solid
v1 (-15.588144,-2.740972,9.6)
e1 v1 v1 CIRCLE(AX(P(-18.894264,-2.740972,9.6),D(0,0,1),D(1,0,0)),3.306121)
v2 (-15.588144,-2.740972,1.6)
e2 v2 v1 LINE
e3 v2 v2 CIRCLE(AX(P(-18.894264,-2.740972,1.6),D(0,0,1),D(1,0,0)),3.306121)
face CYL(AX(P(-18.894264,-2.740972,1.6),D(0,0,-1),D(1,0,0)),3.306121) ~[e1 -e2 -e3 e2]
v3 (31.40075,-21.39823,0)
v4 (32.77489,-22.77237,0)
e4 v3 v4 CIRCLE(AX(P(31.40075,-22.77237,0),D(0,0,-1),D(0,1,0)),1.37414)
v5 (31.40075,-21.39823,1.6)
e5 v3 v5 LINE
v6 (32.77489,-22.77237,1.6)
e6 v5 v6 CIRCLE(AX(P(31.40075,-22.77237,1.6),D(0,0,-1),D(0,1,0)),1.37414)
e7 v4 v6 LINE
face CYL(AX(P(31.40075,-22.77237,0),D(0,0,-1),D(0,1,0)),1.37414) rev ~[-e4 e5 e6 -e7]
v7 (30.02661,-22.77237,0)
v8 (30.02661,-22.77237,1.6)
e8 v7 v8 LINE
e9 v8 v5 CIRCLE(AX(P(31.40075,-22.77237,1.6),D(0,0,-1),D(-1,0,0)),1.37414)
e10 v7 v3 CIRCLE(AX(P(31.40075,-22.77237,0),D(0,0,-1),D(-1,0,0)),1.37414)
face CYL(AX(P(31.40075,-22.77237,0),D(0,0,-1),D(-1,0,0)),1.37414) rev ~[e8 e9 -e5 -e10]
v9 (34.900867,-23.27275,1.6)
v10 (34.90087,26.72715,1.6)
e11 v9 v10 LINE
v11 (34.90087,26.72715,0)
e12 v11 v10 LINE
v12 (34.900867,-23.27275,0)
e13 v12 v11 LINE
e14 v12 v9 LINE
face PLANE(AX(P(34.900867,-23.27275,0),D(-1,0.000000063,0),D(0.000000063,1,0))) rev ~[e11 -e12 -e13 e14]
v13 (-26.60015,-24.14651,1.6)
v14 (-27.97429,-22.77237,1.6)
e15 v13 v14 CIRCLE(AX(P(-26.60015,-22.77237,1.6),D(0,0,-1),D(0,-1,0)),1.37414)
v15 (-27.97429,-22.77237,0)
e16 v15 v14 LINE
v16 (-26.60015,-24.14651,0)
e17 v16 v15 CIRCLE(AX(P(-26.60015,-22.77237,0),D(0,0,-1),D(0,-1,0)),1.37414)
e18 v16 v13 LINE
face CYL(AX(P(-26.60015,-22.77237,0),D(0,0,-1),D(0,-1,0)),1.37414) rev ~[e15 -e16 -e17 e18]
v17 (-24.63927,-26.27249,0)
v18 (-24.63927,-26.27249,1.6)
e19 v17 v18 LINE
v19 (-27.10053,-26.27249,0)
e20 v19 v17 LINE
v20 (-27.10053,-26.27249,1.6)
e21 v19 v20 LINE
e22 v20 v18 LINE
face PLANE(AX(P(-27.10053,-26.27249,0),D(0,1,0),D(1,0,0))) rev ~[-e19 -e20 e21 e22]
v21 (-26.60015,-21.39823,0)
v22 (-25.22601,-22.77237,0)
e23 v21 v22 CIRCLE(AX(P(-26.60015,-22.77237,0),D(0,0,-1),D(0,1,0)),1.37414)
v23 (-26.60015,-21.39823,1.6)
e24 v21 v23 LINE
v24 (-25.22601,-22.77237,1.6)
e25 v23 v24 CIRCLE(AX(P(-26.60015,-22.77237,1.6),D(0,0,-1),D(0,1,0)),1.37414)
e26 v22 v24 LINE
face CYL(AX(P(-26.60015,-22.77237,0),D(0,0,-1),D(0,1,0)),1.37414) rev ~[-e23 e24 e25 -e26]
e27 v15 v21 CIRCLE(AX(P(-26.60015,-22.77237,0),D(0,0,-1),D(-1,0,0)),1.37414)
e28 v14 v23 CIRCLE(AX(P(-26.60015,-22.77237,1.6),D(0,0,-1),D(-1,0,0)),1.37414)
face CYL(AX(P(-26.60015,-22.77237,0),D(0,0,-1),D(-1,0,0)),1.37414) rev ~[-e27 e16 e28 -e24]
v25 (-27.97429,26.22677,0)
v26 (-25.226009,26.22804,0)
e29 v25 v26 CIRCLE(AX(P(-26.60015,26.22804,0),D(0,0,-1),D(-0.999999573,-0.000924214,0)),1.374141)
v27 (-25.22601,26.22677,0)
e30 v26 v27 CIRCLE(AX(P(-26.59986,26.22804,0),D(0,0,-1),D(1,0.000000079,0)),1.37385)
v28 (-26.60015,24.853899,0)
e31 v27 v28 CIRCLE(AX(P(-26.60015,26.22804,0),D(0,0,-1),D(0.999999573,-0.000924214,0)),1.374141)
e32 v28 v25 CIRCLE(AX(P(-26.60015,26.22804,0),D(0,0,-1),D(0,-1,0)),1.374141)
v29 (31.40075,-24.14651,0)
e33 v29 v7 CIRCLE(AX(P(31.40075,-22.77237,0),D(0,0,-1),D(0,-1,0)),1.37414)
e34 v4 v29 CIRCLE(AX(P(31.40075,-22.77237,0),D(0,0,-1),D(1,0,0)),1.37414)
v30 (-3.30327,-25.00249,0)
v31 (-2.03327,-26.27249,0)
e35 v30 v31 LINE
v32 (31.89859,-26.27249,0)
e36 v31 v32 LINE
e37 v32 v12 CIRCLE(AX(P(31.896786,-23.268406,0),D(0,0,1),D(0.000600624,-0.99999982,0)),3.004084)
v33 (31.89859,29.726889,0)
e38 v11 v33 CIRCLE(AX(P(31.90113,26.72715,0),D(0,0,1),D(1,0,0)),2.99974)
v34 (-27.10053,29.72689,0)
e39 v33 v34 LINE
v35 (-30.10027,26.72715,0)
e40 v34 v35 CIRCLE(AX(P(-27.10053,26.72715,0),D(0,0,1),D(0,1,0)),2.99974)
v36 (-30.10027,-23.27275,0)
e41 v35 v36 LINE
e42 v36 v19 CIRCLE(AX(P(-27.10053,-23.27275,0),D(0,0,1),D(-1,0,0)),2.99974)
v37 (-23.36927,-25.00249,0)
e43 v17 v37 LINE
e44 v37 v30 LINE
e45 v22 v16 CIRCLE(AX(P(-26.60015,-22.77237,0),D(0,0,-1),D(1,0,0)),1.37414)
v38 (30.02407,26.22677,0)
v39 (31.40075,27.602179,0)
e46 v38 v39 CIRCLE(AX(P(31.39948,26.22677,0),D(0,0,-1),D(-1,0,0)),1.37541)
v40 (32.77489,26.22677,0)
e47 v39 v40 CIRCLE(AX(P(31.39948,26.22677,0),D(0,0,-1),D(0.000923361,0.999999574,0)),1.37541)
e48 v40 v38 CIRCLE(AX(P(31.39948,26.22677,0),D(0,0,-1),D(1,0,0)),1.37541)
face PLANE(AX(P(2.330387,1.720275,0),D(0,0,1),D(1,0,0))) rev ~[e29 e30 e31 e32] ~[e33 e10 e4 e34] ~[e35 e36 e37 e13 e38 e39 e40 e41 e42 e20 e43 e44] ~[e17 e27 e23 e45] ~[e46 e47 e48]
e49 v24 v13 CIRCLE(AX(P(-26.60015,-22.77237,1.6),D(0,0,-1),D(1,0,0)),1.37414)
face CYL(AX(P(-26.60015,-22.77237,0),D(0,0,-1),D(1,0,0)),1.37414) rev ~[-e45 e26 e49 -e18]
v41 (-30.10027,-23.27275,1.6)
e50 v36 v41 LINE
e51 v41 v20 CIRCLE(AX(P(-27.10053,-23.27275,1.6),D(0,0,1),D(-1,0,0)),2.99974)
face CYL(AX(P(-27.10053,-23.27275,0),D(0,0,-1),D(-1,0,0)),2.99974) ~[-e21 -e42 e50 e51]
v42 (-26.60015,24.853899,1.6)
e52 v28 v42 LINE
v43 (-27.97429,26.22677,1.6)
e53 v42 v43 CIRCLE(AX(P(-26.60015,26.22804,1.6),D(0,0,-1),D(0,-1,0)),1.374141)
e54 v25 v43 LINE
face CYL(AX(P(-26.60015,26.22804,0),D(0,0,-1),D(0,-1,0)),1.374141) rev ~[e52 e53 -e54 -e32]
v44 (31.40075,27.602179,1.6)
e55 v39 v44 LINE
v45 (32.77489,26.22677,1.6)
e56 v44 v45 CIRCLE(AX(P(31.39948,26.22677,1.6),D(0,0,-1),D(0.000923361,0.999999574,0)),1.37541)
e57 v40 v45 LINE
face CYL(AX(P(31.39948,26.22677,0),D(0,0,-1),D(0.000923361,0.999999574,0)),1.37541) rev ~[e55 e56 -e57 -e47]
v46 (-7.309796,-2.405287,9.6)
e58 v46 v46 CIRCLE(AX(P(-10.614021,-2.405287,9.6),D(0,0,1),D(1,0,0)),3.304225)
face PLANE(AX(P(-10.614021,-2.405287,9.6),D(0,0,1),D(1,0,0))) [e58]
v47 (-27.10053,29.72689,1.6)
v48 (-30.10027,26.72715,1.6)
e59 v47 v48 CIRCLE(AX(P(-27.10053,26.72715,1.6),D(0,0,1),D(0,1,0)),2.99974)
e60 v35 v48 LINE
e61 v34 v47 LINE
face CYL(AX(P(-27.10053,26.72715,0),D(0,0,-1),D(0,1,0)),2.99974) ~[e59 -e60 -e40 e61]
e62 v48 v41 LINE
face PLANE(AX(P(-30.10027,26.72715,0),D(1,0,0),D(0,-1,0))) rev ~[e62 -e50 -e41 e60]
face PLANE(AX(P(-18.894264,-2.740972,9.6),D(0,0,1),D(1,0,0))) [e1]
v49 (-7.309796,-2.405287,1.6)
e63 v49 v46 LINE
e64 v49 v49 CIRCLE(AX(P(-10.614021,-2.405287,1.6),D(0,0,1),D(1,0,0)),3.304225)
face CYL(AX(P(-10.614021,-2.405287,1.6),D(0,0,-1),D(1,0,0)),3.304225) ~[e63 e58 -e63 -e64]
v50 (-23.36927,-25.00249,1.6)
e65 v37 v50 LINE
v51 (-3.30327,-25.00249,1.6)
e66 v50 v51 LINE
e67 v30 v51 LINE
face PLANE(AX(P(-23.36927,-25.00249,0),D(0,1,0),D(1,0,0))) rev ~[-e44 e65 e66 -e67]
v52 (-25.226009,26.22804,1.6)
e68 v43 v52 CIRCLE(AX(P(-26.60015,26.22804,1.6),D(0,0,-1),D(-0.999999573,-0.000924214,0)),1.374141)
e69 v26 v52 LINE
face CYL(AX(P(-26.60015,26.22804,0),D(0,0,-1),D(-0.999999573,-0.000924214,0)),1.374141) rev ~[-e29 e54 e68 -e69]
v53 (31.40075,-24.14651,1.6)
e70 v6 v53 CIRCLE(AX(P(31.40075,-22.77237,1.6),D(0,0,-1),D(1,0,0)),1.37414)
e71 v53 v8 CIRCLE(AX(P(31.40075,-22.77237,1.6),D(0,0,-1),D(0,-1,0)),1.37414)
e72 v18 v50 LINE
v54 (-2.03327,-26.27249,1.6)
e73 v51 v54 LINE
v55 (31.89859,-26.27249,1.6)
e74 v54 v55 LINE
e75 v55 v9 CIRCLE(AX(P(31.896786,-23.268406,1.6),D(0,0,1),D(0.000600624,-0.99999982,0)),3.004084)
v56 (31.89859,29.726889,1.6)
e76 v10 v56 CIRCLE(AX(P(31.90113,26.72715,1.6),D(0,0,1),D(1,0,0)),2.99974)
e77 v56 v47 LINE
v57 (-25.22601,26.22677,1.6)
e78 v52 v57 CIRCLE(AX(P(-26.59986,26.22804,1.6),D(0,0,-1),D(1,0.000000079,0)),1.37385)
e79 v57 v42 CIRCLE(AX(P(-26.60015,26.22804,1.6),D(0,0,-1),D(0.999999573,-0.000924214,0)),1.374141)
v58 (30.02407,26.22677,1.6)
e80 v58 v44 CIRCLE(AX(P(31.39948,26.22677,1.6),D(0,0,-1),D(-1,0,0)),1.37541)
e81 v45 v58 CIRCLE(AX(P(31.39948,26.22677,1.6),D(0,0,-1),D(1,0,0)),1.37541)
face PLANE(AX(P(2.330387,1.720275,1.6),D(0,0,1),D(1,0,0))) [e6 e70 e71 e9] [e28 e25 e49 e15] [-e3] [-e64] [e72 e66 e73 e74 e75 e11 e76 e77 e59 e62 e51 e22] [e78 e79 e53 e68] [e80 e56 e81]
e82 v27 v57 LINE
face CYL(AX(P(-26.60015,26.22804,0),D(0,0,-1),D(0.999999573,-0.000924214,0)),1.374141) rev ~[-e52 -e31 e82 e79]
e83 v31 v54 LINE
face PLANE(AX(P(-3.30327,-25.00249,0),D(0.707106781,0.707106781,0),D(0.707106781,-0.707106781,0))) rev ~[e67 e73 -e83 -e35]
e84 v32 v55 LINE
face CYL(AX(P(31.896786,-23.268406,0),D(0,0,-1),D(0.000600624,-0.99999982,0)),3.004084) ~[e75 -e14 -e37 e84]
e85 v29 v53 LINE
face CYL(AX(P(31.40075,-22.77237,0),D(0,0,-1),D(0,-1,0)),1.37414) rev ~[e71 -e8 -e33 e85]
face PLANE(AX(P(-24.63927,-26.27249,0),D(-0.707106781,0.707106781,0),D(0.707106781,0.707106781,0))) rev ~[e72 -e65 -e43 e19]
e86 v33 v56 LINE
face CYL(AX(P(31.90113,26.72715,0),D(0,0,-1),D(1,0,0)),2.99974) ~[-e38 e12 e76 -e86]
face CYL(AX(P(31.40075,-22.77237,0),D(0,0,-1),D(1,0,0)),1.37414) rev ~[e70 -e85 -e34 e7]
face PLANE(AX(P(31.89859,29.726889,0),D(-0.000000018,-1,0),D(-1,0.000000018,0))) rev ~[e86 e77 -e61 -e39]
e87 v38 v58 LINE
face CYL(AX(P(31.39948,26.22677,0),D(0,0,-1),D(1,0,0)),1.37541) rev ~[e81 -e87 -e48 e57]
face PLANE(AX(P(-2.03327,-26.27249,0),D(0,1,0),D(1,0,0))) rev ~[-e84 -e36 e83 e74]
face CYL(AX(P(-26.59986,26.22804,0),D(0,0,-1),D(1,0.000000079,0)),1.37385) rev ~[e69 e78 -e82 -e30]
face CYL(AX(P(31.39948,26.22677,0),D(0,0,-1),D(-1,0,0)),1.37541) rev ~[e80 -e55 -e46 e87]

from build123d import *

# Parameters (mm, degrees)
F1_DEPTH = 1.6
F2_R     = 3.3061205596
F2_R_2   = 3.3042251001
F3_DEPTH = 8


# Not quite as in the source:
# - ends of sketch curves that miss each other by under 0.0002 mm in the source are joined


with BuildPart() as f1:
    # F0 (on Top) → F1 (new body)
    with BuildSketch(Plane.XY):
        with BuildLine():
            Line((-30.10027, 26.72715), (-30.10027, -23.27275))
            ThreePointArc((-30.10027, -23.27275), (-29.2216664958, -25.3938864958), (-27.10053, -26.27249))
            Line((-27.10053, -26.27249), (-24.63927, -26.27249))
            Line((-24.63927, -26.27249), (-23.36927, -25.00249))
            Line((-23.36927, -25.00249), (-3.30327, -25.00249))
            Line((-3.30327, -25.00249), (-2.03327, -26.27249))
            Line((-2.03327, -26.27249), (31.89859, -26.27249))
            ThreePointArc((31.89859, -26.27249), (34.020096129, -25.3935121782), (34.9008668601, -23.2727499955))
            Line((34.9008668601, -23.2727499955), (34.90087, 26.72715))
            ThreePointArc((34.90087, 26.72715), (34.0213682803, 28.8491843311), (31.8985900009, 29.7268889246))
            Line((31.8985900009, 29.7268889246), (-27.10053, 29.72689))
            ThreePointArc((-27.10053, 29.72689), (-29.2216664958, 28.8482864958), (-30.10027, 26.72715))
        make_face()
        with BuildLine():
            ThreePointArc((-26.60015, -24.14651), (-27.5718137123, -23.7440337123), (-27.97429, -22.77237))
            ThreePointArc((-27.97429, -22.77237), (-27.5718137123, -21.8007062877), (-26.60015, -21.39823))
            ThreePointArc((-26.60015, -21.39823), (-25.6284862877, -21.8007062877), (-25.22601, -22.77237))
            ThreePointArc((-25.22601, -22.77237), (-25.6284862877, -23.7440337123), (-26.60015, -24.14651))
        make_face(mode=Mode.SUBTRACT)
        with BuildLine():
            ThreePointArc((31.40075, -24.14651), (30.4290862877, -23.7440337123), (30.02661, -22.77237))
            ThreePointArc((30.02661, -22.77237), (30.4290862877, -21.8007062877), (31.40075, -21.39823))
            ThreePointArc((31.40075, -21.39823), (32.3724137123, -21.8007062877), (32.77489, -22.77237))
            ThreePointArc((32.77489, -22.77237), (32.3724137123, -23.7440337123), (31.40075, -24.14651))
        make_face(mode=Mode.SUBTRACT)
        with BuildLine():
            ThreePointArc((-26.60015, 24.8538994131), (-27.5713650107, 25.2559269636), (-27.97429, 26.22677))
            ThreePointArc((-27.97429, 26.22677), (-27.5722630364, 27.1992550107), (-26.60015, 27.6021805869))
            ThreePointArc((-26.60015, 27.6021805869), (-25.6284858727, 27.1997041273), (-25.2260094131, 26.22804))
            ThreePointArc((-25.2260094131, 26.22804), (-25.2260095598, 26.2274049999), (-25.22601, 26.22677))
            ThreePointArc((-25.22601, 26.22677), (-25.6289349893, 25.2559269636), (-26.60015, 24.8538994131))
        make_face(mode=Mode.SUBTRACT)
        with BuildLine():
            ThreePointArc((32.77489, 26.22677), (31.39948, 24.85136), (30.02407, 26.22677))
            ThreePointArc((30.02407, 26.22677), (30.4273673786, 27.1997806471), (31.40075, 27.6021794137))
            ThreePointArc((31.40075, 27.6021794137), (32.3724906471, 27.1988826214), (32.77489, 26.22677))
        make_face(mode=Mode.SUBTRACT)
    extrude(amount=F1_DEPTH)

    # F2 (on face) → F3 (join)
    with BuildSketch(Plane.XY.offset(1.6)):
        with Locations((-18.8942644745, -2.7409724426)):
            Circle(F2_R)
        with Locations((-10.6140207499, -2.4052869994)):
            Circle(F2_R_2)
    extrude(amount=F3_DEPTH)


solid = f1.part
